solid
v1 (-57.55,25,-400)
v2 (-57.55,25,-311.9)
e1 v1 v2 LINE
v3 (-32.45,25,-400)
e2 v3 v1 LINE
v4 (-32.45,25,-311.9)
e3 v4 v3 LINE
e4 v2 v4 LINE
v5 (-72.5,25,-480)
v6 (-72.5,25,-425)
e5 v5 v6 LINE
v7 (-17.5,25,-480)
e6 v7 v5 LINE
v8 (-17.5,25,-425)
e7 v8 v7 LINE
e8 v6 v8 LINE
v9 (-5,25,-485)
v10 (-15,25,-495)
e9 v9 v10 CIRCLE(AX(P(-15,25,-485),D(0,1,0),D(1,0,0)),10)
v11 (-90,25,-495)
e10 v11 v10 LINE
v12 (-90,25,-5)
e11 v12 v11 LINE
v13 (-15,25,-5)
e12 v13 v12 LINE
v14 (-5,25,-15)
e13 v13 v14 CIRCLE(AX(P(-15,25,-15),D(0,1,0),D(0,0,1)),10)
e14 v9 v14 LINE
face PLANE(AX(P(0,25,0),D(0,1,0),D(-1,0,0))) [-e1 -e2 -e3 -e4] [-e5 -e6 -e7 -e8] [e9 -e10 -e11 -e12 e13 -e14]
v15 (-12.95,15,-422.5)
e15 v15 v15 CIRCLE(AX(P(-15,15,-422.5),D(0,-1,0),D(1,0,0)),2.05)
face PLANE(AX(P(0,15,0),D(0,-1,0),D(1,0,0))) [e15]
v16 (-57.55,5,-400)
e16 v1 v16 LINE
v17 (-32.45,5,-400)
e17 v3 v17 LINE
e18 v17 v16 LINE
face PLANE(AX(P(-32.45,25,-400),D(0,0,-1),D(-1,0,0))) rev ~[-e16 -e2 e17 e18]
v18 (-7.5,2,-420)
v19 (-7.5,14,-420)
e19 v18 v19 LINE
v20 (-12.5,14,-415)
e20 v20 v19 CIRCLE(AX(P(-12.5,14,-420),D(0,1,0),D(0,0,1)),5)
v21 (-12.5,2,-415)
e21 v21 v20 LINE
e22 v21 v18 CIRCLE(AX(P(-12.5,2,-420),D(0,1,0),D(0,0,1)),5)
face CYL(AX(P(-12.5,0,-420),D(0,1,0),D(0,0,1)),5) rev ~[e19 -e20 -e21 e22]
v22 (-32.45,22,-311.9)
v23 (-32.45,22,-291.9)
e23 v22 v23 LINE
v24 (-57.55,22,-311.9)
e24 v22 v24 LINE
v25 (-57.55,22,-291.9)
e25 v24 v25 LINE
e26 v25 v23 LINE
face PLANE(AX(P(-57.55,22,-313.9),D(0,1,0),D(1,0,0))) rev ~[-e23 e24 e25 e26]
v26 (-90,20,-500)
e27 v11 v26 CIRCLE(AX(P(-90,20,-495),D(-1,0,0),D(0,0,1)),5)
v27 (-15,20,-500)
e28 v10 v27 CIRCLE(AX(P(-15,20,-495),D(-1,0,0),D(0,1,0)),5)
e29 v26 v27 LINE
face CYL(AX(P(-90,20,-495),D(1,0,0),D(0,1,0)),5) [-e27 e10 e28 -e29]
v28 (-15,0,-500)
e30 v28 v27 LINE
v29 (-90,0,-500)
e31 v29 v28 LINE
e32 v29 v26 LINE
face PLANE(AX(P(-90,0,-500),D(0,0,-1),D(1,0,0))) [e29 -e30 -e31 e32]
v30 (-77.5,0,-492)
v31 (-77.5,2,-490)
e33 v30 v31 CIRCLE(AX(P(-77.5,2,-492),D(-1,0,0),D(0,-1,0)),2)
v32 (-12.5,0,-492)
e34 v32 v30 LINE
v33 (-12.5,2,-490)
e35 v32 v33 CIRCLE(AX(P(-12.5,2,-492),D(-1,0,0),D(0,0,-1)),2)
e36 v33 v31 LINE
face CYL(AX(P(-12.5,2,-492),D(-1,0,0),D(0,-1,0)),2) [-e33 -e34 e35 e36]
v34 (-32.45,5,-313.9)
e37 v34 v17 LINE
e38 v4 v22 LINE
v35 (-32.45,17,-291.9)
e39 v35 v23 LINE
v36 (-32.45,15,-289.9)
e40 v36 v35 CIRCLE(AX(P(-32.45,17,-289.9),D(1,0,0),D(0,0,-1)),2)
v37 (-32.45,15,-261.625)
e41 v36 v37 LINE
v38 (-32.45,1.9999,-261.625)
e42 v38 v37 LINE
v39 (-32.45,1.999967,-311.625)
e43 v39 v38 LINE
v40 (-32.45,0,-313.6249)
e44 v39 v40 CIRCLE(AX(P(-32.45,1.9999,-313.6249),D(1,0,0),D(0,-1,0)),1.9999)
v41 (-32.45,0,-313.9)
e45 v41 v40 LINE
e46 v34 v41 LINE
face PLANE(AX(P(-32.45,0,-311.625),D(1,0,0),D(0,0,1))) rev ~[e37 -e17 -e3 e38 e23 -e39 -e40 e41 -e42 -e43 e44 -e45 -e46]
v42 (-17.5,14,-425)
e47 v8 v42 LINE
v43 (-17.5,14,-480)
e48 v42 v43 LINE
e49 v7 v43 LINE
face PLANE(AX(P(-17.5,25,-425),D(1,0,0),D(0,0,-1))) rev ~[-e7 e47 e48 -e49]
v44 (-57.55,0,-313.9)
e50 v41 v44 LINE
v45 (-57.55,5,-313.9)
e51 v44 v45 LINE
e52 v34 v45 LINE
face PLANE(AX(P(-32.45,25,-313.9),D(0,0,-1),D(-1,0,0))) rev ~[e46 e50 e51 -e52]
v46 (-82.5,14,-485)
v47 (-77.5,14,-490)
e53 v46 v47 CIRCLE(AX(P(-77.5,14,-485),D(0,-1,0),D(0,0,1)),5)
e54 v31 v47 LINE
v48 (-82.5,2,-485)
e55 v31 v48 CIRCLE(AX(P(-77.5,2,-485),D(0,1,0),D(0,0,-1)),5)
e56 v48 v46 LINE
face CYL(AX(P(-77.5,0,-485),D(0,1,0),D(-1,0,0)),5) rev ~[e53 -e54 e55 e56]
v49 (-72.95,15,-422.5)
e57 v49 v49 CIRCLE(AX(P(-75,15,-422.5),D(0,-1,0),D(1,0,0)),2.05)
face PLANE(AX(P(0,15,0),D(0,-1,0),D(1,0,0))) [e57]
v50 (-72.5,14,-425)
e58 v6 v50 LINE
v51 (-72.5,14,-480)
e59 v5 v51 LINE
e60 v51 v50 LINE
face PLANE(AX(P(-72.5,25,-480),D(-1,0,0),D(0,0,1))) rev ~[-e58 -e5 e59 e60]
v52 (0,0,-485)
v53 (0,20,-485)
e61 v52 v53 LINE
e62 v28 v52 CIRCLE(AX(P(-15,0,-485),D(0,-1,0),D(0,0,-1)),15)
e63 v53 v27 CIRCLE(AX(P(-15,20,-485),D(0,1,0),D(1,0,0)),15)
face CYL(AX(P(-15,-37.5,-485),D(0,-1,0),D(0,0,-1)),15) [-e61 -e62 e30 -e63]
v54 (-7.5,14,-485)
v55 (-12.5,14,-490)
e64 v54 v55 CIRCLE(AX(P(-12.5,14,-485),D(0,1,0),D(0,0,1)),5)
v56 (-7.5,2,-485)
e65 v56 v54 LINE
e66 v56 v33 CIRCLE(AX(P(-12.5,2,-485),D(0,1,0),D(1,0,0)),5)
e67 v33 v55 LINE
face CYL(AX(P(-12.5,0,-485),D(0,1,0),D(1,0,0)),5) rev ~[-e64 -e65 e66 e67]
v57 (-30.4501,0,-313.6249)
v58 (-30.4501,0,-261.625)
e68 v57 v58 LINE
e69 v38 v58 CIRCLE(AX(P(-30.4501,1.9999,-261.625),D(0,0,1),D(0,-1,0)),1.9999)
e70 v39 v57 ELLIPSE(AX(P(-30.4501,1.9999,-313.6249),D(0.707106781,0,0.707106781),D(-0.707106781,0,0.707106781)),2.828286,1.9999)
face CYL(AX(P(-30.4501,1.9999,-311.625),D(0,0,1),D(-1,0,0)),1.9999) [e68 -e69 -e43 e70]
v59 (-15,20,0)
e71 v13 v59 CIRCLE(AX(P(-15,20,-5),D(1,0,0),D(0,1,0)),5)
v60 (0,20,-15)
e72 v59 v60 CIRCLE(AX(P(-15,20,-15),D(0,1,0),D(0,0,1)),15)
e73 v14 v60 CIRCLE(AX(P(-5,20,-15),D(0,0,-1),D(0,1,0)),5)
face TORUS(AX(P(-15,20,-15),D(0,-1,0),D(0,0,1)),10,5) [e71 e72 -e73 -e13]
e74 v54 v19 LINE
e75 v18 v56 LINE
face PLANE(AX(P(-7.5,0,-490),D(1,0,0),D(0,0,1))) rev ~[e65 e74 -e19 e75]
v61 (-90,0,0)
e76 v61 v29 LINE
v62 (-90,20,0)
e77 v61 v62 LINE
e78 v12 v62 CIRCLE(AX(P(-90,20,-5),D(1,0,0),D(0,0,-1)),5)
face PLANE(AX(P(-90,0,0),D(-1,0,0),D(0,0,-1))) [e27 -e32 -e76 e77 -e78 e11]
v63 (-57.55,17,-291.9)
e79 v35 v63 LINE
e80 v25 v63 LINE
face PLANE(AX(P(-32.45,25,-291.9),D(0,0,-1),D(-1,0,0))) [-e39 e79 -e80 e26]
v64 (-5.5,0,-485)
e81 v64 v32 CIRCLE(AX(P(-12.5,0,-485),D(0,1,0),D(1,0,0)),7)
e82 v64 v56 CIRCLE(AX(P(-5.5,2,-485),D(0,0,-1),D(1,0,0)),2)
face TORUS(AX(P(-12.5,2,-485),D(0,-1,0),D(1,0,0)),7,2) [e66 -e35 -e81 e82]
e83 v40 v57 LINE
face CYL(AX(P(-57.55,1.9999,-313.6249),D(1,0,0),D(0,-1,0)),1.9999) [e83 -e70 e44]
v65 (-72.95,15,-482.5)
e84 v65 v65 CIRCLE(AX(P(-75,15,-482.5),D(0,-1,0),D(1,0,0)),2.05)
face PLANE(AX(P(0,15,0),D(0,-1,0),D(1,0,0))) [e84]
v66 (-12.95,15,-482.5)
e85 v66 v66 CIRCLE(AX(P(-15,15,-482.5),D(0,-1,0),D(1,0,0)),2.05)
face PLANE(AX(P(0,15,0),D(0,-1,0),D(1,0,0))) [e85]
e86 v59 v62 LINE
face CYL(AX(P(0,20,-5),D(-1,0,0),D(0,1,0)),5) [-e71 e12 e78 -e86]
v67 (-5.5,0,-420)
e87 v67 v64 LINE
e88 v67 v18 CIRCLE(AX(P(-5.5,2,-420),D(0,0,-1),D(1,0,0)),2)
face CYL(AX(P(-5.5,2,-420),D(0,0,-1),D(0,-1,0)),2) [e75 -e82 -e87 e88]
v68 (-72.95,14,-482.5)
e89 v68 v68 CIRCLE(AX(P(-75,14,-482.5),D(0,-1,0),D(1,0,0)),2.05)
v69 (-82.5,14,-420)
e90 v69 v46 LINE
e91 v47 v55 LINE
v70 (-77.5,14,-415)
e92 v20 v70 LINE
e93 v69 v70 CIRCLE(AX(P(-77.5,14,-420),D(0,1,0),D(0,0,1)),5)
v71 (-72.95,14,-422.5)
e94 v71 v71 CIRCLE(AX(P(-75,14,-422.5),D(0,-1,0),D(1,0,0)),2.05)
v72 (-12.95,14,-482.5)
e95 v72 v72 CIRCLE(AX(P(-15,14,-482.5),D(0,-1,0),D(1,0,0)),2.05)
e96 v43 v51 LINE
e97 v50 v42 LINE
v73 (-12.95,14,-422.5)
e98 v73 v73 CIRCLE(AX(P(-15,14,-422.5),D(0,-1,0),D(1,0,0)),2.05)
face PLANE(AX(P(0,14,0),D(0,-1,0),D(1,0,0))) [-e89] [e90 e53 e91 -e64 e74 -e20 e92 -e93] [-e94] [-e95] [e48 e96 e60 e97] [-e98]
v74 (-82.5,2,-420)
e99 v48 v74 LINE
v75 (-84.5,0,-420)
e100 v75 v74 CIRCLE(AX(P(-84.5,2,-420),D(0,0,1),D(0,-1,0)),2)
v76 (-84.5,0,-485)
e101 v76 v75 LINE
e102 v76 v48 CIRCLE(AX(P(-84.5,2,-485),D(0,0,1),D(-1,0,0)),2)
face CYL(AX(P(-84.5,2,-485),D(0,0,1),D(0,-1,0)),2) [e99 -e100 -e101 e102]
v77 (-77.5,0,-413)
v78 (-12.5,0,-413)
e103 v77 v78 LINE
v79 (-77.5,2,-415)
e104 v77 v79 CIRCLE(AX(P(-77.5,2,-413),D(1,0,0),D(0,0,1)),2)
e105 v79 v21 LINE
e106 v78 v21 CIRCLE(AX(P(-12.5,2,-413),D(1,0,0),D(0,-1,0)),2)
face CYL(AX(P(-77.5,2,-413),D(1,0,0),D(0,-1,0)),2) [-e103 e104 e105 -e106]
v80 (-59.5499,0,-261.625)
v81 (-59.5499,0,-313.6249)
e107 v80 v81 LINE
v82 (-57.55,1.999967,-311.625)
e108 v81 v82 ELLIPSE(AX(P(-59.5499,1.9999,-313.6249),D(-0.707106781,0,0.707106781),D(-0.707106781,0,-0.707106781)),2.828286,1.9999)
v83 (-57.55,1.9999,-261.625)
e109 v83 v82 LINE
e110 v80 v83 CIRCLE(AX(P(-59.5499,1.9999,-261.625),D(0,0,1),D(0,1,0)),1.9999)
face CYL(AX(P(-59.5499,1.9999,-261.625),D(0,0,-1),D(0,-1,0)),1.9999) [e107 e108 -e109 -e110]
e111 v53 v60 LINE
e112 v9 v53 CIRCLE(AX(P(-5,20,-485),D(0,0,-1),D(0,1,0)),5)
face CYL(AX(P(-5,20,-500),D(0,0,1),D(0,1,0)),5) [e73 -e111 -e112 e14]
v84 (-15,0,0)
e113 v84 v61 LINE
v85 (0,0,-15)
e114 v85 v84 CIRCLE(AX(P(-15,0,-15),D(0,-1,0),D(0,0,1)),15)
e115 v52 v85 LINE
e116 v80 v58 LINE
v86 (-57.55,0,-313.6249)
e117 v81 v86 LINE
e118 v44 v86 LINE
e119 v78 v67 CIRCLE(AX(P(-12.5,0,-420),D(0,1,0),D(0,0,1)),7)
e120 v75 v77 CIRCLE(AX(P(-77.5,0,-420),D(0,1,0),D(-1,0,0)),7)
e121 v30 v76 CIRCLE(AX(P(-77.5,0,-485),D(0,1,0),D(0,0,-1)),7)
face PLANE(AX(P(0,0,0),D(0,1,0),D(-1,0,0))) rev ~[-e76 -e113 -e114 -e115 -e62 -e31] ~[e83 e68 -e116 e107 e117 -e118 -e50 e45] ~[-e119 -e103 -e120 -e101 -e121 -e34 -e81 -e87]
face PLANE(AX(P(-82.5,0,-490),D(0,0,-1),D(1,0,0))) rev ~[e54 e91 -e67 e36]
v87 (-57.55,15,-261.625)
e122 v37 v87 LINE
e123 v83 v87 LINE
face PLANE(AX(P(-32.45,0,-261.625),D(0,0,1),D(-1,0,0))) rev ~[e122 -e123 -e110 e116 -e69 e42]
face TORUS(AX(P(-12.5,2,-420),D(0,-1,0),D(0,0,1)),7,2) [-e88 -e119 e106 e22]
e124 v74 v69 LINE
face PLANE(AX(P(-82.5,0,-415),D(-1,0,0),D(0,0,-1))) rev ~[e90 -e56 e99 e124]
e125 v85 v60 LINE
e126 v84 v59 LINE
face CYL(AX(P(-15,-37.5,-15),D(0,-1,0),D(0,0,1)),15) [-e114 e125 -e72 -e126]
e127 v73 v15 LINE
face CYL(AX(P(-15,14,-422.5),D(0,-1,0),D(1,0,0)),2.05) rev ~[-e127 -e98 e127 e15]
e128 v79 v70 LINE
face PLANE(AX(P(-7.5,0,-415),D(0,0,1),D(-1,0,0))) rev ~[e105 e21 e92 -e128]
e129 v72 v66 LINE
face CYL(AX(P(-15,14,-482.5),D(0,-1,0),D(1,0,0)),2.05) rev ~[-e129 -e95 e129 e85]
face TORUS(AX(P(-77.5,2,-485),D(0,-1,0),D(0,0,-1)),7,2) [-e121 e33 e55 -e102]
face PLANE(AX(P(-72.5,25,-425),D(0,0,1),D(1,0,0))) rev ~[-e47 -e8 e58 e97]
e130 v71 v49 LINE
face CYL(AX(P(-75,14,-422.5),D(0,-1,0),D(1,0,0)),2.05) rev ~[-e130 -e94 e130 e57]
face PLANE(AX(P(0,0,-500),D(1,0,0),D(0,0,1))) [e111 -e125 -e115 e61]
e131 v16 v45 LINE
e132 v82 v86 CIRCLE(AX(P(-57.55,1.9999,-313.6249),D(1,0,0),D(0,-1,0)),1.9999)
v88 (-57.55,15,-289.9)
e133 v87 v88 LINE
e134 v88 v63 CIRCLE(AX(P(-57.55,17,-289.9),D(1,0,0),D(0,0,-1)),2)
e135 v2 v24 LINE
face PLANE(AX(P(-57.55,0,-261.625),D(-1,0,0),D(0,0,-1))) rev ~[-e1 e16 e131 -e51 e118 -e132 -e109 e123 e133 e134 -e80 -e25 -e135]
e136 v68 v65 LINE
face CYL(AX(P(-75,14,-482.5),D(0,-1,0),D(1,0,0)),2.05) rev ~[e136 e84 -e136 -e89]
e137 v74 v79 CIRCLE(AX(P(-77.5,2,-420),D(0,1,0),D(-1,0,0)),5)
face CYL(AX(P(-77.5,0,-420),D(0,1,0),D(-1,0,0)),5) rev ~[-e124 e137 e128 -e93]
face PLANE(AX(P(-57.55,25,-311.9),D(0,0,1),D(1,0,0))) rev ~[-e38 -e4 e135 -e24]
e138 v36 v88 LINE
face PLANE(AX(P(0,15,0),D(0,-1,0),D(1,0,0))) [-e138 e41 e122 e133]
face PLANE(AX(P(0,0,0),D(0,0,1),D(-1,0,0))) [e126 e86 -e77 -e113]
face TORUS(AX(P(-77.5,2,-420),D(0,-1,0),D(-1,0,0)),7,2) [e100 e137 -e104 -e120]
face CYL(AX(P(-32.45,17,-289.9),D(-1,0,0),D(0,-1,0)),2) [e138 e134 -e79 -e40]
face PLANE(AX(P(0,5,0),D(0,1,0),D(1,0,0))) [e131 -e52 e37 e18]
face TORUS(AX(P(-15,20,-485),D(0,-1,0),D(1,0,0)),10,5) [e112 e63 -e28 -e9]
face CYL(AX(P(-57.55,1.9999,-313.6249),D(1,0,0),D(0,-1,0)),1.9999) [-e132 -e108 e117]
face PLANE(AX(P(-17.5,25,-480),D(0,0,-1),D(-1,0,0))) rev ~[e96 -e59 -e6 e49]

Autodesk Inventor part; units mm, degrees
ref_plane "YZ Plane" through (0, 0, 0) normal (1, 0, 0) x (0, 1, 0)
ref_plane "XZ Plane" through (0, 0, 0) normal (0, 1, 0) x (-1, 0, 0)
sketch "Sketch1" plane through (0, 0, 0) normal (0, 1, 0) x (-1, 0, 0)
  line L0 (0, 0) -> (90, 0)
  line L1 (90, 0) -> (90, -500)
  line L2 (90, -500) -> (0, -500)
  line L3 (0, -500) -> (0, 0)
  dimension "d0" = 90
  dimension "d1" = 500
extrude "Extrusion1" add sketch "Sketch1" along normal blind 25
sketch "Sketch6" plane through (0, 25, 0) normal (0, 1, 0) x (1, 0, 0)
  line L0 (-57.55, 311.9) -> (-32.45, 311.9)
  line L1 (-32.45, 311.9) -> (-32.45, 400)
  line L2 (-32.45, 400) -> (-57.55, 400)
  line L3 (-57.55, 400) -> (-57.55, 311.9)
  line L4 (-90, 500) -> (-90, 0) projected
  line L5 (0, 500) -> (-90, 500) projected
  point P0 (0, 0)
  dimension "d36" = 25.1
  dimension "d37" = 88.1
  dimension "d38" = 32.45
  dimension "d39" = 100
extrude "Extrusion6" cut sketch "Sketch6" against normal blind 20
sketch "Sketch7" plane through (-32.45, 25, -311.9) normal (0, 0, -1) x (-1, 0, 0)
  line L0 (0, 0) -> (25.1, 0) projected
  line L1 (0, 0) -> (0, -20) projected
  line L2 (0, -20) -> (25.1, -20) projected
  line L3 (25.1, 0) -> (25.1, -20) projected
  line L4 (0, -4) -> (25.1, -4)
  line L5 (25.1, -4) -> (25.1, -23)
  line L6 (0, -4) -> (0, -23)
  line L7 (25.1, -23) -> (0, -23)
  point P0 (-32.45, -25)
  dimension "d42" = 16
  dimension "d43" = 19
  dimension "d44" = 19
ref_plane "Work Plane2" through (-32.45, 25, -313.9) normal (0, 0, -1) x (-1, 0, 0)
sketch "Sketch9" plane through (-32.45, 25, -313.9) normal (0, 0, -1) x (-1, 0, 0)
  line L0 (25.1, -4) -> (25.1, -23) projected
  line L1 (0, 0) -> (0, -20) projected
  line L2 (25.1, -23) -> (0, -23) projected
  line L3 (0, -23) -> (0, -4)
  line L4 (0, 0) -> (25.1, 0) projected
  line L5 (25.1, -4) -> (25.1, 0)
  line L6 (0, 0) -> (25.1, 0)
  line L7 (0, 0) -> (0, -4)
  line L8 (25.1, -3) -> (0, -3)
  point P0 (-32.45, -25)
  dimension "d97" = 3
extrude "Extrusion9" cut sketch "Sketch9" against normal blind 22 contours L0 L2 L3 L1 L8 L5
sketch "Sketch12" plane through (0, 25, 0) normal (0, 1, 0) x (1, 0, 0)
  line L0 (-17.5, 480) -> (-72.5, 480)
  line L1 (-72.5, 480) -> (-72.5, 425)
  line L2 (-72.5, 425) -> (-17.5, 425)
  line L3 (-17.5, 425) -> (-17.5, 480)
  line L4 (0, 0) -> (0, 500) projected
  line L5 (-32.45, 311.9) -> (-57.55, 311.9) projected
  line L6 (0, 500) -> (-90, 500) projected
  dimension "d57" = 55
  dimension "d58" = 55
  dimension "d59" = 17.5
  dimension "d100" = 20
extrude "Extrusion11" cut sketch "Sketch12" against normal blind 30
sketch "Sketch13" plane through (0, 0, 0) normal (0, -1, 0) x (1, 0, 0)
  line L0 (-72.5, -425) -> (-17.5, -425) projected
  line L1 (-17.5, -425) -> (-17.5, -480) projected
  line L2 (-17.5, -480) -> (-72.5, -480) projected
  line L3 (-72.5, -480) -> (-72.5, -425) projected
  line L4 (-7.5, -490) -> (-7.5, -415)
  line L5 (-7.5, -415) -> (-82.5, -415)
  line L6 (-82.5, -415) -> (-82.5, -490)
  line L7 (-82.5, -490) -> (-7.5, -490)
  point P0 (0, 0)
  dimension "d68" = 10
extrude "Extrusion12" cut sketch "Sketch13" against normal blind 14
sketch "Sketch14" plane through (0, 25, 0) normal (0, 1, 0) x (1, 0, 0)
  line L0 (-72.5, 425) -> (-72.5, 480) projected
  line L1 (-17.5, 425) -> (-72.5, 425) projected
  line L2 (-17.5, 480) -> (-17.5, 425) projected
  line L3 (-72.5, 480) -> (-17.5, 480) projected
  line L4 (-75, 482.5) -> (-75, 422.5) construction
  line L5 (-75, 422.5) -> (-15, 422.5) construction
  line L6 (-15, 422.5) -> (-15, 482.5) construction
  line L7 (-15, 482.5) -> (-75, 482.5) construction
  circle A0 centre (-75, 422.5) radius 2.05
  circle A1 centre (-75, 482.5) radius 2.05
  circle A2 centre (-15, 482.5) radius 2.05
  circle A3 centre (-15, 422.5) radius 2.05
  point P0 (0, 0)
  dimension "d69" = 2.5
  dimension "d70" = 4.1
  dimension "d71" = 4.1
  dimension "d72" = 4.1
  dimension "d73" = 4.1
fillet "Fillet14" radius 5 4 edges at (-82.5, 7, -415) (-7.5, 7, -415) (-7.5, 7, -490) (-82.5, 7, -490)
fillet "Fillet15" radius 2 8 edges at (-8.9645, 0, -488.5355) (-45, 0, -490) (-81.0355, 0, -488.5355) (-82.5, 0, -452.5) (-81.0355, 0, -416.4645) (-45, 0, -415) (-8.9645, 0, -416.4645) (-7.5, 0, -452.5)
sketch "Sketch15" plane through (0, 0, 0) normal (0, -1, 0) x (1, 0, 0)
  line L0 (-57.55, -311.625) -> (-32.45, -311.625)
  line L1 (-32.45, -311.625) -> (-32.45, -261.625)
  line L2 (-32.45, -261.625) -> (-57.55, -261.625)
  line L3 (-57.55, -261.625) -> (-57.55, -311.625)
  line L4 (-90, 0) -> (-90, -500) projected
  line L5 (-90, -500) -> (0, -500) projected
  point P0 (0, 0)
  dimension "d81" = 25.1
  dimension "d82" = 50
  dimension "d83" = 32.45
  dimension "d84" = 188.375
extrude "Extrusion14" cut sketch "Sketch15" against normal blind 15
fillet "Fillet16" radius 2 1 edges at (-45, 15, -291.9)
fillet "Fillet17" radius 2 3 edges at (-32.45, 0, -286.625) (-57.55, 0, -286.625) (-45, 0, -311.625)
fillet "Fillet18" radius 5 3 edges at (0, 25, -250) (-45, 25, 0) (-45, 25, -500)
fillet "Fillet19" radius 15 4 edges at (-1.4645, 23.5355, -1.4645) (0, 10, 0) (-1.4645, 23.5355, -498.5355) (0, 10, -500)
sketch "Sketch22" plane through (-57.55, 2, -313.9) normal (0, 1, 0) x (1, 0, 0)
  line L0 (0, -2.275) -> (25.1, -2.275) projected
  line L1 (25.1, 0) -> (25.1, -2.275) projected
  line L2 (25.1, 0) -> (0, 0) projected
  line L3 (0, 0) -> (0, -2.275) projected
  point P0 (57.55, -313.9)
extrude "Extrusion18" cut sketch "Sketch22" against normal blind 6
sketch "Sketch23" plane through (0, 0, 0) normal (0, -1, 0) x (1, 0, 0)
  point P0 (0, 0)
sketch "Sketch24" plane through (0, 25, 0) normal (0, 1, 0) x (1, 0, 0)
  line L0 (-24.2952, 12.3012) -> (-24.2952, 52.9327) construction
  line L1 (-24.2952, 52.9327) -> (-73.6667, 52.9327) construction
  line L2 (-73.6667, 52.9327) -> (-73.6667, 12.3012) construction
  line L3 (-73.6667, 12.3012) -> (-24.2952, 12.3012) construction
  point P0 (0, 0)
extrude "Extrusion19" [suppressed]
sketch "Sketch25" plane through (0, 14, 0) normal (0, -1, 0) x (1, 0, 0)
  line L0 (-17.5, -480) -> (-17.5, -425) projected
  line L1 (-17.5, -425) -> (-72.5, -425) projected
  line L2 (-72.5, -480) -> (-17.5, -480) projected
  line L3 (-72.5, -425) -> (-72.5, -480) projected
  circle A0 centre (-75, -482.5) radius 2.05 projected
  circle A1 centre (-15, -482.5) radius 2.05 projected
  circle A2 centre (-15, -422.5) radius 2.05 projected
  circle A3 centre (-75, -422.5) radius 2.05 projected
  point P0 (0, 0)
extrude "Extrusion20" cut sketch "Sketch25" against normal blind 1 contours A0 | A1 | A2 | A3
properties part number "Hilla" material "Lauan, Meranti"
